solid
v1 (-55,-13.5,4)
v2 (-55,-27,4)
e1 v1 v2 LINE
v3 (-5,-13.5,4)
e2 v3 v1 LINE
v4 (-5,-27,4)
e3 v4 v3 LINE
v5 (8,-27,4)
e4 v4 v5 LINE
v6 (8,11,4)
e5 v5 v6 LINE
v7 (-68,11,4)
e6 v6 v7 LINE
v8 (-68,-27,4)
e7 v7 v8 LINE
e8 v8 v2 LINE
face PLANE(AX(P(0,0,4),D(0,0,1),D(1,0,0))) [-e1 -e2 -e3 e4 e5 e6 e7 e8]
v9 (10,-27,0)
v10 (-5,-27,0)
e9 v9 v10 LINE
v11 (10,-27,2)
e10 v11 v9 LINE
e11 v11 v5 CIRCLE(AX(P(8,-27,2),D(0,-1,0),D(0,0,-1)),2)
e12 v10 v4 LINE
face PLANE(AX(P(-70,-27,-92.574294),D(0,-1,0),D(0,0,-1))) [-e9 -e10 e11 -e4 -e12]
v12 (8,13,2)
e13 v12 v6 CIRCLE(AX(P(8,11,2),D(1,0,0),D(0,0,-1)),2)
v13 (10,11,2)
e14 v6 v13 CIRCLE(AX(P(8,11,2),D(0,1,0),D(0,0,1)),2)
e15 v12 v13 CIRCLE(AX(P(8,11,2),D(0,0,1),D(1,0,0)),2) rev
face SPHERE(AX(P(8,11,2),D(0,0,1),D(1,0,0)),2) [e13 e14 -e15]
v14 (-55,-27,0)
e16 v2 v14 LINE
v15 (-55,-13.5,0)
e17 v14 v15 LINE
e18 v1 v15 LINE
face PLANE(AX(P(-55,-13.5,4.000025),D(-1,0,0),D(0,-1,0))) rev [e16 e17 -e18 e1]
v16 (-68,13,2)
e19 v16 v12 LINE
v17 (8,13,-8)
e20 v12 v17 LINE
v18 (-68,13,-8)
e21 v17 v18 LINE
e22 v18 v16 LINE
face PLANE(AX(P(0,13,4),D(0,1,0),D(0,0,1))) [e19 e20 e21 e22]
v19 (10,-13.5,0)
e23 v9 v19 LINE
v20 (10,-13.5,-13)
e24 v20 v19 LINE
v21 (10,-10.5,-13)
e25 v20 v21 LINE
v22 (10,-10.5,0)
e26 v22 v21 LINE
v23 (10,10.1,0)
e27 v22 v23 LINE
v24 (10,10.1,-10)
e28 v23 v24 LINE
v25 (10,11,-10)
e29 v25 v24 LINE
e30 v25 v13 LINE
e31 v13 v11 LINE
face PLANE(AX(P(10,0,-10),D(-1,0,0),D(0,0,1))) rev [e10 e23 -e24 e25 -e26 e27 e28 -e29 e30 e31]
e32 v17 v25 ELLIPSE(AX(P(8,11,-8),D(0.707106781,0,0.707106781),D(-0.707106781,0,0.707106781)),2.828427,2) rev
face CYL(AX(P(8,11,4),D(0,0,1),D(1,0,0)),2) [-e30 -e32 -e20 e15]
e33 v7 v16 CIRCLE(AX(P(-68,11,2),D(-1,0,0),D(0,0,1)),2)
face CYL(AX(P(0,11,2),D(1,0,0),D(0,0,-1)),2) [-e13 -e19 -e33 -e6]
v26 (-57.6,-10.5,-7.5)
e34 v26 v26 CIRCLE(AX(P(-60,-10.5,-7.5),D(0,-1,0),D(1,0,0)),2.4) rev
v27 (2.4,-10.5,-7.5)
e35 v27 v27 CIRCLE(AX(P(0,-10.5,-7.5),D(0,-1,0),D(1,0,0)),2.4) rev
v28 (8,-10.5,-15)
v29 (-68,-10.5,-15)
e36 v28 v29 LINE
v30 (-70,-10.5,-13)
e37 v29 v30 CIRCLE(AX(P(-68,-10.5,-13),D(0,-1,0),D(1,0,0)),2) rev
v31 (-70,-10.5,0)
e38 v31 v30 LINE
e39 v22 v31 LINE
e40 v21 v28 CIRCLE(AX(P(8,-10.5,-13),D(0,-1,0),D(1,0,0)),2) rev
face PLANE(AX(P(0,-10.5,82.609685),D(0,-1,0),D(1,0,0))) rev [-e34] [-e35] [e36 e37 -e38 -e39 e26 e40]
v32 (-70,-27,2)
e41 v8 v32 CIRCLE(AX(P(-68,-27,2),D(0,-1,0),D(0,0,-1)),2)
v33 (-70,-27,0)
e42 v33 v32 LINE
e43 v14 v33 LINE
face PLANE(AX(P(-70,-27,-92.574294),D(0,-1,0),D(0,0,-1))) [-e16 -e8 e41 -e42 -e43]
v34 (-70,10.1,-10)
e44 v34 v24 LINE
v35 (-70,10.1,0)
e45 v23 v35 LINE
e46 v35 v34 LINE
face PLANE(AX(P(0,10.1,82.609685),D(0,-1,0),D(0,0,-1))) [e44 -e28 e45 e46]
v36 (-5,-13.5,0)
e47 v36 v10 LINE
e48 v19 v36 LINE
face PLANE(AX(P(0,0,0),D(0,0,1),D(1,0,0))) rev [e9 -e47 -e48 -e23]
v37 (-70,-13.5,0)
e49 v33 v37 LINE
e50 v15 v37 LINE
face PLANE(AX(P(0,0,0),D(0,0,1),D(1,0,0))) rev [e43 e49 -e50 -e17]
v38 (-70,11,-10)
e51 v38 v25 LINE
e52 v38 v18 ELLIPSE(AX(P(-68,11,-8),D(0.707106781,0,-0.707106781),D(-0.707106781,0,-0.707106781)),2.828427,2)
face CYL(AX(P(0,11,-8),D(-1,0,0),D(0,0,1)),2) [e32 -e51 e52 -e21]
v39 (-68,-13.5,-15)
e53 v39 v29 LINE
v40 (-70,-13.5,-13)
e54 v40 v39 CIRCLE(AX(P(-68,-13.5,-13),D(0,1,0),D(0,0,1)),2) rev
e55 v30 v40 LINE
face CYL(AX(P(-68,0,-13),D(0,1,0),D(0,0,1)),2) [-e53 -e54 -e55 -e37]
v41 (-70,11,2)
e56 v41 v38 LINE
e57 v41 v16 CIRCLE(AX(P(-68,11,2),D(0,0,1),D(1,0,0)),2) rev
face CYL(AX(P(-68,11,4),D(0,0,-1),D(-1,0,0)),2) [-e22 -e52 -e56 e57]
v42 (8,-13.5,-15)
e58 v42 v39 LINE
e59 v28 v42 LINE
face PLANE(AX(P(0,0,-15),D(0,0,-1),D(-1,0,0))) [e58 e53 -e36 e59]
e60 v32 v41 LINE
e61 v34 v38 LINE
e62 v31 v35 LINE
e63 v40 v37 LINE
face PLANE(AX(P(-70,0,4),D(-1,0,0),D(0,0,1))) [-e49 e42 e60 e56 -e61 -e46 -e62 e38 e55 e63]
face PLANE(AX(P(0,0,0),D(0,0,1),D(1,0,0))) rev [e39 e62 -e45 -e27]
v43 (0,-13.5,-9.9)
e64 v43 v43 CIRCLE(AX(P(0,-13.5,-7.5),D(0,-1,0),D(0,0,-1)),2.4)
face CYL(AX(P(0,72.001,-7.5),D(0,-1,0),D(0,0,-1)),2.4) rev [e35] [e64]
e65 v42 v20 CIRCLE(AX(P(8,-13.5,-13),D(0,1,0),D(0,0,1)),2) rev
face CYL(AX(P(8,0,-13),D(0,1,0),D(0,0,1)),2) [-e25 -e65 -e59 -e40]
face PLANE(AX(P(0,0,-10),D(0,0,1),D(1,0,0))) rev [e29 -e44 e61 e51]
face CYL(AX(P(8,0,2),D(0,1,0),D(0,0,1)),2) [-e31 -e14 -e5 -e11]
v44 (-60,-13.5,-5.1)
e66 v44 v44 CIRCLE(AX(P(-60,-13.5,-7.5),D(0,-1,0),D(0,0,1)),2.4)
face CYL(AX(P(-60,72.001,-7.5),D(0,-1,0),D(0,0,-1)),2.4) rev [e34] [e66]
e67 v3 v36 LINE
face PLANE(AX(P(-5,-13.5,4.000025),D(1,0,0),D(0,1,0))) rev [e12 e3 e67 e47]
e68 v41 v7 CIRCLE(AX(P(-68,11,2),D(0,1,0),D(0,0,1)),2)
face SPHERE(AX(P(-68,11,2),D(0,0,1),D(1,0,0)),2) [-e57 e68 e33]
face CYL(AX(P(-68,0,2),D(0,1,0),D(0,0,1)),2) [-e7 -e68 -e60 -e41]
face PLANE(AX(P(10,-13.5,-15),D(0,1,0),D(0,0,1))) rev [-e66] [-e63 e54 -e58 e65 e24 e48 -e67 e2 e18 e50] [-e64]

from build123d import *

# Parameters (mm, degrees)
SKETCH_1_R              = 1.7
SKETCH_1_R_2            = 11.5
EXTRUDE_1_DEPTH         = 4
SKETCH_1_4_W            = 80
SKETCH_1_4_H            = 3
EXTRUDE_2_DEPTH         = 10
EXTRUDE_3_DEPTH         = 10
RIB_2_REACH             = 110.093
SKETCH_4_WALL_W         = 240.545785644
SKETCH_4_WALL_H         = 5
SKETCH_5_W              = 2
SKETCH_5_H              = 0.1
SKETCH_5_W_2            = 4.2
SKETCH_5_H_2            = 2
CUT_EXTRUDE_2_DEPTH     = 10
CHAMFER_1_SIZE          = 0.25
SKETCH_6_W              = 91
SKETCH_6_H              = 17
EXTRUDE_4_DEPTH         = 4
SKETCH_7_W              = 80
SKETCH_7_H              = 3.5
EXTRUDE_5_DEPTH         = 15
SKETCH_8_W              = 50
SKETCH_8_H              = 13.5
CUT_EXTRUDE_3_DEPTH     = 102.533245787
CUT_EXTRUDE_4_DEPTH     = 15
CUT_EXTRUDE_5_REACH     = 113.513
SKETCH_10_R             = 2.4
FILLET_1_R              = 10
SKETCH_11_W             = 92.157342817
SKETCH_11_H             = 59.862511732
CUT_EXTRUDE_6_DEPTH     = 103.200782776
CUT_EXTRUDE_START       = -15
CUT_EXTRUDE_7_OUTLINE_W = 80
CUT_EXTRUDE_7_OUTLINE_H = 0.5
CUT_EXTRUDE_7_DEPTH     = 15
FILLET_2_R              = 2


# Read off the part's stored shape, not the designer's step: 切除-拉伸7
with BuildPart() as part:
    # 草图1 → 凸台-拉伸1 (new body)
    with BuildSketch(Plane.XY):
        with BuildLine():
            Line((-70, 13), (-70, -10))
            Line((-70, -10), (21, -10))
            Line((21, -10), (21, 44.755002002))
            ThreePointArc((21, 44.755002002), (20.506939094, 46.920065511), (19.125, 48.658125751))
            ThreePointArc((19.125, 48.658125751), (18, 51), (19.125, 53.341874249))
            ThreePointArc((19.125, 53.341874249), (20.506939094, 55.079934489), (21, 57.244997998))
            Line((21, 57.244997998), (21, 67))
            ThreePointArc((21, 67), (19.535533906, 70.535533906), (16, 72))
            Line((16, 72), (6.244997998, 72))
            ThreePointArc((6.244997998, 72), (4.079934489, 71.506939094), (2.341874249, 70.125))
            ThreePointArc((2.341874249, 70.125), (0, 69), (-2.341874249, 70.125))
            ThreePointArc((-2.341874249, 70.125), (-4.079934489, 71.506939094), (-6.244997998, 72))
            Line((-6.244997998, 72), (-16, 72))
            ThreePointArc((-16, 72), (-19.535533906, 70.535533906), (-21, 67))
            Line((-21, 67), (-21, 57.244997998))
            ThreePointArc((-21, 57.244997998), (-20.506939094, 55.079934489), (-19.125, 53.341874249))
            ThreePointArc((-19.125, 53.341874249), (-18, 51), (-19.125, 48.658125751))
            ThreePointArc((-19.125, 48.658125751), (-20.506939094, 46.920065511), (-21, 44.755002002))
            Line((-21, 44.755002002), (-21, 13))
            Line((-21, 13), (-70, 13))
        make_face()
        with Locations((-15.5, 35.5)):
            Circle(SKETCH_1_R, mode=Mode.SUBTRACT)
        with Locations((-15.5, 66.5)):
            Circle(SKETCH_1_R, mode=Mode.SUBTRACT)
        with Locations((15.5, 35.5)):
            Circle(SKETCH_1_R, mode=Mode.SUBTRACT)
        with Locations((0, 51)):
            Circle(SKETCH_1_R_2, mode=Mode.SUBTRACT)
        with Locations((15.5, 66.5)):
            Circle(SKETCH_1_R, mode=Mode.SUBTRACT)
    extrude(amount=EXTRUDE_1_DEPTH)

    # 草图1<4> → 凸台-拉伸2 (add)
    with BuildSketch(Plane.XY):
        with Locations((-30, 11.5)):
            Rectangle(SKETCH_1_4_W, SKETCH_1_4_H)
    extrude(amount=-EXTRUDE_2_DEPTH)

    # 草图1<5> → 凸台-拉伸3 (add)
    with BuildSketch(Plane.XY):
        Polygon((3.05, 8), (3.05, 10), (-3.05, 10), (-3.05, 8), (-5.05, 8), (-5.05, 6.5), (-4.55, 6), (4.55, 6), (5.05, 6.5), (5.05, 8), align=None)
        Polygon((-16.95, 10), (-23.05, 10), (-23.05, 8), (-25.05, 8), (-25.05, 6.5), (-24.55, 6), (-15.45, 6), (-14.95, 6.5), (-14.95, 8), (-16.95, 8), align=None)
        Polygon((-36.95, 10), (-43.05, 10), (-43.05, 8), (-45.05, 8), (-45.05, 6.5), (-44.55, 6), (-35.45, 6), (-34.95, 6.5), (-34.95, 8), (-36.95, 8), align=None)
        Polygon((-26, 4.55), (-26, -4.55), (-26.5, -5.05), (-28, -5.05), (-28, -3.05), (-32, -3.05), (-32, -5.05), (-33.5, -5.05), (-34, -4.55), (-34, 4.55), (-33.5, 5.05), (-32, 5.05), (-32, 3.05), (-28, 3.05), (-28, 5.05), (-26.5, 5.05), align=None)
        Polygon((-23.05, -8), (-23.05, -10), (-16.95, -10), (-16.95, -8), (-14.95, -8), (-14.95, -6.5), (-15.45, -6), (-24.55, -6), (-25.05, -6.5), (-25.05, -8), align=None)
        Polygon((-43.05, -8), (-43.05, -10), (-36.95, -10), (-36.95, -8), (-34.95, -8), (-34.95, -6.5), (-35.45, -6), (-44.55, -6), (-45.05, -6.5), (-45.05, -8), align=None)
    extrude(amount=-EXTRUDE_3_DEPTH)

    # 草图4 wall → 筋2 (add, up to next)
    with BuildSketch(Plane(origin=(10, 23, -5), x_dir=(0, 0.894427191, 0.4472135955), z_dir=(0, -0.4472135955, 0.894427191)), mode=Mode.PRIVATE) as rib_2_sk1:
        with Locations((0, 2.5)):
            Rectangle(SKETCH_4_WALL_W, SKETCH_4_WALL_H)
    rib_2_tool1 = extrude(rib_2_sk1.sketch, amount=RIB_2_REACH, mode=Mode.PRIVATE) - part.part
    rib_2 = rib_2_tool1.solids().sort_by_distance((10, 23, -5))[0]
    add(rib_2)

    # 镜向1: 筋2 across plane
    add(rib_2.mirror(Plane(origin=(0, 0, 0), x_dir=(0, 0, 1), z_dir=(1, 0, 0))))

    # 草图5 → 切除-拉伸2 (cut)
    with BuildSketch(Plane(origin=(0, 0, -10), x_dir=(-1, 0, 0), z_dir=(0, 0, -1))):
        with Locations((15.95, 7.95)):
            Rectangle(SKETCH_5_W, SKETCH_5_H)
        with Locations((24.05, 7.95)):
            Rectangle(SKETCH_5_W, SKETCH_5_H)
        with Locations((35.95, 7.95)):
            Rectangle(SKETCH_5_W, SKETCH_5_H)
        with Locations((44.05, 7.95)):
            Rectangle(SKETCH_5_W, SKETCH_5_H)
        with Locations((30, 4.05)):
            Rectangle(SKETCH_5_W_2, SKETCH_5_H_2)
        with Locations((30, -4.05)):
            Rectangle(SKETCH_5_W_2, SKETCH_5_H_2)
        with Locations((44.05, -7.95)):
            Rectangle(SKETCH_5_W, SKETCH_5_H)
        with Locations((35.95, -7.95)):
            Rectangle(SKETCH_5_W, SKETCH_5_H)
        with Locations((24.05, -7.95)):
            Rectangle(SKETCH_5_W, SKETCH_5_H)
        with Locations((15.95, -7.95)):
            Rectangle(SKETCH_5_W, SKETCH_5_H)
    extrude(amount=-CUT_EXTRUDE_2_DEPTH, mode=Mode.SUBTRACT)

    # 倒角1
    chamfer_1_edges = [part.edges().sort_by_distance(p)[0] for p in [
        (3.05, 8, -5),
        (5.05, 8, -5),
        (-5.05, 8, -5),
        (-3.05, 8, -5),
        (-16.95, 7.9, -5),
        (-14.95, 7.9, -5),
        (-23.05, 7.9, -5),
        (-25.05, 7.9, -5),
        (-36.95, 7.9, -5),
        (-34.95, 7.9, -5),
        (-43.05, 7.9, -5),
        (-45.05, 7.9, -5),
        (-27.9, 5.05, -5),
        (-32.1, 3.05, -5),
        (-32.1, 5.05, -5),
        (-27.9, 3.05, -5),
        (-32.1, -5.05, -5),
        (-32.1, -3.05, -5),
        (-27.9, -3.05, -5),
        (-27.9, -5.05, -5),
        (-43.05, -7.9, -5),
        (-45.05, -7.9, -5),
        (-36.95, -7.9, -5),
        (-34.95, -7.9, -5),
        (-23.05, -7.9, -5),
        (-25.05, -7.9, -5),
        (-16.95, -7.9, -5),
        (-14.95, -7.9, -5),
    ]]
    chamfer(chamfer_1_edges, length=CHAMFER_1_SIZE)

    # 草图6 → 凸台-拉伸4 (add)
    with BuildSketch(Plane.XY.offset(4)):
        with Locations((-24.5, -18.5)):
            Rectangle(SKETCH_6_W, SKETCH_6_H)
    extrude(amount=-EXTRUDE_4_DEPTH)

    # 草图7 → 凸台-拉伸5 (add)
    with BuildSketch(Plane(origin=(0, 0, 0), x_dir=(-1, 0, 0), z_dir=(0, 0, -1))):
        with Locations((30, -11.75)):
            Rectangle(SKETCH_7_W, SKETCH_7_H)
    extrude(amount=EXTRUDE_5_DEPTH)

    # 草图8 → 切除-拉伸3 (cut, through all)
    with BuildSketch(Plane(origin=(0, 0, 0), x_dir=(-1, 0, 0), z_dir=(0, 0, -1))):
        with Locations((30, -20.25)):
            Rectangle(SKETCH_8_W, SKETCH_8_H)
        with BuildLine():
            Line((-21, -27), (-10, -27))
            Line((-10, -27), (-10, 26))
            ThreePointArc((-10, 26), (-11.171572875, 28.828427125), (-14, 30))
            Line((-14, 30), (-16, 30))
            ThreePointArc((-16, 30), (-19.535533906, 31.464466094), (-21, 35))
            Line((-21, 35), (-21, 30))
            Line((-21, 30), (-21, -27))
        make_face()
    extrude(amount=-CUT_EXTRUDE_3_DEPTH, mode=Mode.SUBTRACT)

    # 草图9 → 切除-拉伸4 (cut)
    with BuildSketch(Plane(origin=(0, 0, -15), x_dir=(-1, 0, 0), z_dir=(0, 0, -1))):
        Polygon((50, -10), (25.452851286, -10), (11.122555598, -10), (11.122555598, 0.364824121), (25.452851286, 0.364824121), (25.452851286, 5.586221175), (50, 5.586221175), align=None)
    extrude(amount=-CUT_EXTRUDE_4_DEPTH, mode=Mode.SUBTRACT)

    # 草图10 → 切除-拉伸5 (cut, up to next)
    with BuildSketch(Plane.XZ.offset(13.5), mode=Mode.PRIVATE) as cut_extrude_5_sk1:
        with Locations(Location((0, -7.5, 0), (0, 0, 270))):
            Circle(SKETCH_10_R)
    cut_extrude_5_tool1 = extrude(cut_extrude_5_sk1.sketch, amount=-CUT_EXTRUDE_5_REACH, mode=Mode.PRIVATE) & part.part
    # 草图10 → 切除-拉伸5 (cut, up to next)
    with BuildSketch(Plane.XZ.offset(13.5), mode=Mode.PRIVATE) as cut_extrude_5_sk2:
        with Locations(Location((-60, -7.5, 0), (0, 0, 270))):
            Circle(SKETCH_10_R)
    cut_extrude_5_tool2 = extrude(cut_extrude_5_sk2.sketch, amount=-CUT_EXTRUDE_5_REACH, mode=Mode.PRIVATE) & part.part
    add(cut_extrude_5_tool1.solids().sort_by_distance((0, -13.5, -7.5))[0], mode=Mode.SUBTRACT)
    add(cut_extrude_5_tool2.solids().sort_by_distance((-60, -13.5, -7.5))[0], mode=Mode.SUBTRACT)

    # 圆角1
    fillet_1_edges = [part.edges().sort_by_distance(p)[0] for p in [
        (-21, 13, 2),
    ]]
    fillet(fillet_1_edges, radius=FILLET_1_R)

    # 草图11 → 切除-拉伸6 (cut, through all)
    with BuildSketch(Plane(origin=(0, 0, -15), x_dir=(-1, 0, 0), z_dir=(0, 0, -1))):
        with Locations((23.921328592, 42.931255866)):
            Rectangle(SKETCH_11_W, SKETCH_11_H)
    extrude(amount=-CUT_EXTRUDE_6_DEPTH, mode=Mode.SUBTRACT)

    # 切除-拉伸7 outline → 切除-拉伸7 (cut)
    with BuildSketch(Plane(origin=(0, 0, -15), x_dir=(-1, 0, 0), z_dir=(0, 0, -1)).offset(CUT_EXTRUDE_START)):
        with Locations((30, -10.25)):
            Rectangle(CUT_EXTRUDE_7_OUTLINE_W, CUT_EXTRUDE_7_OUTLINE_H)
        Polygon((-10, 10.1), (-10, 10), (-3.05, 10), (-3.05, 8.25), (-3.3, 8), (-4.8, 8), (-5.05, 7.75), (-5.05, 6.5), (-4.55, 6), (4.55, 6), (5.05, 6.5), (5.05, 7.75), (4.8, 8), (3.3, 8), (3.05, 8.25), (3.05, 10), (16.95, 10), (16.95, 8.15), (16.7, 7.9), (15.2, 7.9), (14.95, 7.65), (14.95, 6.5), (15.45, 6), (24.55, 6), (25.05, 6.5), (25.05, 7.65), (24.8, 7.9), (23.3, 7.9), (23.05, 8.15), (23.05, 10), (36.95, 10), (36.95, 8.15), (36.7, 7.9), (35.2, 7.9), (34.95, 7.65), (34.95, 6.5), (35.45, 6), (44.55, 6), (45.05, 6.5), (45.05, 7.65), (44.8, 7.9), (43.3, 7.9), (43.05, 8.15), (43.05, 10), (70, 10), (70, 10.1), align=None)
    extrude(amount=CUT_EXTRUDE_7_DEPTH, mode=Mode.SUBTRACT)

    # 圆角2
    fillet_2_edges = [part.edges().sort_by_distance(p)[0] for p in [
        (-70, 13, -3),
        (-70, -12, -15),
        (-30, 13, -10),
        (-70, -7, 4),
        (-30, 13, 4),
        (10, -7, 4),
        (10, 13, -3),
        (10, -12, -15),
    ]]
    fillet(fillet_2_edges, radius=FILLET_2_R)


solid = part.part
